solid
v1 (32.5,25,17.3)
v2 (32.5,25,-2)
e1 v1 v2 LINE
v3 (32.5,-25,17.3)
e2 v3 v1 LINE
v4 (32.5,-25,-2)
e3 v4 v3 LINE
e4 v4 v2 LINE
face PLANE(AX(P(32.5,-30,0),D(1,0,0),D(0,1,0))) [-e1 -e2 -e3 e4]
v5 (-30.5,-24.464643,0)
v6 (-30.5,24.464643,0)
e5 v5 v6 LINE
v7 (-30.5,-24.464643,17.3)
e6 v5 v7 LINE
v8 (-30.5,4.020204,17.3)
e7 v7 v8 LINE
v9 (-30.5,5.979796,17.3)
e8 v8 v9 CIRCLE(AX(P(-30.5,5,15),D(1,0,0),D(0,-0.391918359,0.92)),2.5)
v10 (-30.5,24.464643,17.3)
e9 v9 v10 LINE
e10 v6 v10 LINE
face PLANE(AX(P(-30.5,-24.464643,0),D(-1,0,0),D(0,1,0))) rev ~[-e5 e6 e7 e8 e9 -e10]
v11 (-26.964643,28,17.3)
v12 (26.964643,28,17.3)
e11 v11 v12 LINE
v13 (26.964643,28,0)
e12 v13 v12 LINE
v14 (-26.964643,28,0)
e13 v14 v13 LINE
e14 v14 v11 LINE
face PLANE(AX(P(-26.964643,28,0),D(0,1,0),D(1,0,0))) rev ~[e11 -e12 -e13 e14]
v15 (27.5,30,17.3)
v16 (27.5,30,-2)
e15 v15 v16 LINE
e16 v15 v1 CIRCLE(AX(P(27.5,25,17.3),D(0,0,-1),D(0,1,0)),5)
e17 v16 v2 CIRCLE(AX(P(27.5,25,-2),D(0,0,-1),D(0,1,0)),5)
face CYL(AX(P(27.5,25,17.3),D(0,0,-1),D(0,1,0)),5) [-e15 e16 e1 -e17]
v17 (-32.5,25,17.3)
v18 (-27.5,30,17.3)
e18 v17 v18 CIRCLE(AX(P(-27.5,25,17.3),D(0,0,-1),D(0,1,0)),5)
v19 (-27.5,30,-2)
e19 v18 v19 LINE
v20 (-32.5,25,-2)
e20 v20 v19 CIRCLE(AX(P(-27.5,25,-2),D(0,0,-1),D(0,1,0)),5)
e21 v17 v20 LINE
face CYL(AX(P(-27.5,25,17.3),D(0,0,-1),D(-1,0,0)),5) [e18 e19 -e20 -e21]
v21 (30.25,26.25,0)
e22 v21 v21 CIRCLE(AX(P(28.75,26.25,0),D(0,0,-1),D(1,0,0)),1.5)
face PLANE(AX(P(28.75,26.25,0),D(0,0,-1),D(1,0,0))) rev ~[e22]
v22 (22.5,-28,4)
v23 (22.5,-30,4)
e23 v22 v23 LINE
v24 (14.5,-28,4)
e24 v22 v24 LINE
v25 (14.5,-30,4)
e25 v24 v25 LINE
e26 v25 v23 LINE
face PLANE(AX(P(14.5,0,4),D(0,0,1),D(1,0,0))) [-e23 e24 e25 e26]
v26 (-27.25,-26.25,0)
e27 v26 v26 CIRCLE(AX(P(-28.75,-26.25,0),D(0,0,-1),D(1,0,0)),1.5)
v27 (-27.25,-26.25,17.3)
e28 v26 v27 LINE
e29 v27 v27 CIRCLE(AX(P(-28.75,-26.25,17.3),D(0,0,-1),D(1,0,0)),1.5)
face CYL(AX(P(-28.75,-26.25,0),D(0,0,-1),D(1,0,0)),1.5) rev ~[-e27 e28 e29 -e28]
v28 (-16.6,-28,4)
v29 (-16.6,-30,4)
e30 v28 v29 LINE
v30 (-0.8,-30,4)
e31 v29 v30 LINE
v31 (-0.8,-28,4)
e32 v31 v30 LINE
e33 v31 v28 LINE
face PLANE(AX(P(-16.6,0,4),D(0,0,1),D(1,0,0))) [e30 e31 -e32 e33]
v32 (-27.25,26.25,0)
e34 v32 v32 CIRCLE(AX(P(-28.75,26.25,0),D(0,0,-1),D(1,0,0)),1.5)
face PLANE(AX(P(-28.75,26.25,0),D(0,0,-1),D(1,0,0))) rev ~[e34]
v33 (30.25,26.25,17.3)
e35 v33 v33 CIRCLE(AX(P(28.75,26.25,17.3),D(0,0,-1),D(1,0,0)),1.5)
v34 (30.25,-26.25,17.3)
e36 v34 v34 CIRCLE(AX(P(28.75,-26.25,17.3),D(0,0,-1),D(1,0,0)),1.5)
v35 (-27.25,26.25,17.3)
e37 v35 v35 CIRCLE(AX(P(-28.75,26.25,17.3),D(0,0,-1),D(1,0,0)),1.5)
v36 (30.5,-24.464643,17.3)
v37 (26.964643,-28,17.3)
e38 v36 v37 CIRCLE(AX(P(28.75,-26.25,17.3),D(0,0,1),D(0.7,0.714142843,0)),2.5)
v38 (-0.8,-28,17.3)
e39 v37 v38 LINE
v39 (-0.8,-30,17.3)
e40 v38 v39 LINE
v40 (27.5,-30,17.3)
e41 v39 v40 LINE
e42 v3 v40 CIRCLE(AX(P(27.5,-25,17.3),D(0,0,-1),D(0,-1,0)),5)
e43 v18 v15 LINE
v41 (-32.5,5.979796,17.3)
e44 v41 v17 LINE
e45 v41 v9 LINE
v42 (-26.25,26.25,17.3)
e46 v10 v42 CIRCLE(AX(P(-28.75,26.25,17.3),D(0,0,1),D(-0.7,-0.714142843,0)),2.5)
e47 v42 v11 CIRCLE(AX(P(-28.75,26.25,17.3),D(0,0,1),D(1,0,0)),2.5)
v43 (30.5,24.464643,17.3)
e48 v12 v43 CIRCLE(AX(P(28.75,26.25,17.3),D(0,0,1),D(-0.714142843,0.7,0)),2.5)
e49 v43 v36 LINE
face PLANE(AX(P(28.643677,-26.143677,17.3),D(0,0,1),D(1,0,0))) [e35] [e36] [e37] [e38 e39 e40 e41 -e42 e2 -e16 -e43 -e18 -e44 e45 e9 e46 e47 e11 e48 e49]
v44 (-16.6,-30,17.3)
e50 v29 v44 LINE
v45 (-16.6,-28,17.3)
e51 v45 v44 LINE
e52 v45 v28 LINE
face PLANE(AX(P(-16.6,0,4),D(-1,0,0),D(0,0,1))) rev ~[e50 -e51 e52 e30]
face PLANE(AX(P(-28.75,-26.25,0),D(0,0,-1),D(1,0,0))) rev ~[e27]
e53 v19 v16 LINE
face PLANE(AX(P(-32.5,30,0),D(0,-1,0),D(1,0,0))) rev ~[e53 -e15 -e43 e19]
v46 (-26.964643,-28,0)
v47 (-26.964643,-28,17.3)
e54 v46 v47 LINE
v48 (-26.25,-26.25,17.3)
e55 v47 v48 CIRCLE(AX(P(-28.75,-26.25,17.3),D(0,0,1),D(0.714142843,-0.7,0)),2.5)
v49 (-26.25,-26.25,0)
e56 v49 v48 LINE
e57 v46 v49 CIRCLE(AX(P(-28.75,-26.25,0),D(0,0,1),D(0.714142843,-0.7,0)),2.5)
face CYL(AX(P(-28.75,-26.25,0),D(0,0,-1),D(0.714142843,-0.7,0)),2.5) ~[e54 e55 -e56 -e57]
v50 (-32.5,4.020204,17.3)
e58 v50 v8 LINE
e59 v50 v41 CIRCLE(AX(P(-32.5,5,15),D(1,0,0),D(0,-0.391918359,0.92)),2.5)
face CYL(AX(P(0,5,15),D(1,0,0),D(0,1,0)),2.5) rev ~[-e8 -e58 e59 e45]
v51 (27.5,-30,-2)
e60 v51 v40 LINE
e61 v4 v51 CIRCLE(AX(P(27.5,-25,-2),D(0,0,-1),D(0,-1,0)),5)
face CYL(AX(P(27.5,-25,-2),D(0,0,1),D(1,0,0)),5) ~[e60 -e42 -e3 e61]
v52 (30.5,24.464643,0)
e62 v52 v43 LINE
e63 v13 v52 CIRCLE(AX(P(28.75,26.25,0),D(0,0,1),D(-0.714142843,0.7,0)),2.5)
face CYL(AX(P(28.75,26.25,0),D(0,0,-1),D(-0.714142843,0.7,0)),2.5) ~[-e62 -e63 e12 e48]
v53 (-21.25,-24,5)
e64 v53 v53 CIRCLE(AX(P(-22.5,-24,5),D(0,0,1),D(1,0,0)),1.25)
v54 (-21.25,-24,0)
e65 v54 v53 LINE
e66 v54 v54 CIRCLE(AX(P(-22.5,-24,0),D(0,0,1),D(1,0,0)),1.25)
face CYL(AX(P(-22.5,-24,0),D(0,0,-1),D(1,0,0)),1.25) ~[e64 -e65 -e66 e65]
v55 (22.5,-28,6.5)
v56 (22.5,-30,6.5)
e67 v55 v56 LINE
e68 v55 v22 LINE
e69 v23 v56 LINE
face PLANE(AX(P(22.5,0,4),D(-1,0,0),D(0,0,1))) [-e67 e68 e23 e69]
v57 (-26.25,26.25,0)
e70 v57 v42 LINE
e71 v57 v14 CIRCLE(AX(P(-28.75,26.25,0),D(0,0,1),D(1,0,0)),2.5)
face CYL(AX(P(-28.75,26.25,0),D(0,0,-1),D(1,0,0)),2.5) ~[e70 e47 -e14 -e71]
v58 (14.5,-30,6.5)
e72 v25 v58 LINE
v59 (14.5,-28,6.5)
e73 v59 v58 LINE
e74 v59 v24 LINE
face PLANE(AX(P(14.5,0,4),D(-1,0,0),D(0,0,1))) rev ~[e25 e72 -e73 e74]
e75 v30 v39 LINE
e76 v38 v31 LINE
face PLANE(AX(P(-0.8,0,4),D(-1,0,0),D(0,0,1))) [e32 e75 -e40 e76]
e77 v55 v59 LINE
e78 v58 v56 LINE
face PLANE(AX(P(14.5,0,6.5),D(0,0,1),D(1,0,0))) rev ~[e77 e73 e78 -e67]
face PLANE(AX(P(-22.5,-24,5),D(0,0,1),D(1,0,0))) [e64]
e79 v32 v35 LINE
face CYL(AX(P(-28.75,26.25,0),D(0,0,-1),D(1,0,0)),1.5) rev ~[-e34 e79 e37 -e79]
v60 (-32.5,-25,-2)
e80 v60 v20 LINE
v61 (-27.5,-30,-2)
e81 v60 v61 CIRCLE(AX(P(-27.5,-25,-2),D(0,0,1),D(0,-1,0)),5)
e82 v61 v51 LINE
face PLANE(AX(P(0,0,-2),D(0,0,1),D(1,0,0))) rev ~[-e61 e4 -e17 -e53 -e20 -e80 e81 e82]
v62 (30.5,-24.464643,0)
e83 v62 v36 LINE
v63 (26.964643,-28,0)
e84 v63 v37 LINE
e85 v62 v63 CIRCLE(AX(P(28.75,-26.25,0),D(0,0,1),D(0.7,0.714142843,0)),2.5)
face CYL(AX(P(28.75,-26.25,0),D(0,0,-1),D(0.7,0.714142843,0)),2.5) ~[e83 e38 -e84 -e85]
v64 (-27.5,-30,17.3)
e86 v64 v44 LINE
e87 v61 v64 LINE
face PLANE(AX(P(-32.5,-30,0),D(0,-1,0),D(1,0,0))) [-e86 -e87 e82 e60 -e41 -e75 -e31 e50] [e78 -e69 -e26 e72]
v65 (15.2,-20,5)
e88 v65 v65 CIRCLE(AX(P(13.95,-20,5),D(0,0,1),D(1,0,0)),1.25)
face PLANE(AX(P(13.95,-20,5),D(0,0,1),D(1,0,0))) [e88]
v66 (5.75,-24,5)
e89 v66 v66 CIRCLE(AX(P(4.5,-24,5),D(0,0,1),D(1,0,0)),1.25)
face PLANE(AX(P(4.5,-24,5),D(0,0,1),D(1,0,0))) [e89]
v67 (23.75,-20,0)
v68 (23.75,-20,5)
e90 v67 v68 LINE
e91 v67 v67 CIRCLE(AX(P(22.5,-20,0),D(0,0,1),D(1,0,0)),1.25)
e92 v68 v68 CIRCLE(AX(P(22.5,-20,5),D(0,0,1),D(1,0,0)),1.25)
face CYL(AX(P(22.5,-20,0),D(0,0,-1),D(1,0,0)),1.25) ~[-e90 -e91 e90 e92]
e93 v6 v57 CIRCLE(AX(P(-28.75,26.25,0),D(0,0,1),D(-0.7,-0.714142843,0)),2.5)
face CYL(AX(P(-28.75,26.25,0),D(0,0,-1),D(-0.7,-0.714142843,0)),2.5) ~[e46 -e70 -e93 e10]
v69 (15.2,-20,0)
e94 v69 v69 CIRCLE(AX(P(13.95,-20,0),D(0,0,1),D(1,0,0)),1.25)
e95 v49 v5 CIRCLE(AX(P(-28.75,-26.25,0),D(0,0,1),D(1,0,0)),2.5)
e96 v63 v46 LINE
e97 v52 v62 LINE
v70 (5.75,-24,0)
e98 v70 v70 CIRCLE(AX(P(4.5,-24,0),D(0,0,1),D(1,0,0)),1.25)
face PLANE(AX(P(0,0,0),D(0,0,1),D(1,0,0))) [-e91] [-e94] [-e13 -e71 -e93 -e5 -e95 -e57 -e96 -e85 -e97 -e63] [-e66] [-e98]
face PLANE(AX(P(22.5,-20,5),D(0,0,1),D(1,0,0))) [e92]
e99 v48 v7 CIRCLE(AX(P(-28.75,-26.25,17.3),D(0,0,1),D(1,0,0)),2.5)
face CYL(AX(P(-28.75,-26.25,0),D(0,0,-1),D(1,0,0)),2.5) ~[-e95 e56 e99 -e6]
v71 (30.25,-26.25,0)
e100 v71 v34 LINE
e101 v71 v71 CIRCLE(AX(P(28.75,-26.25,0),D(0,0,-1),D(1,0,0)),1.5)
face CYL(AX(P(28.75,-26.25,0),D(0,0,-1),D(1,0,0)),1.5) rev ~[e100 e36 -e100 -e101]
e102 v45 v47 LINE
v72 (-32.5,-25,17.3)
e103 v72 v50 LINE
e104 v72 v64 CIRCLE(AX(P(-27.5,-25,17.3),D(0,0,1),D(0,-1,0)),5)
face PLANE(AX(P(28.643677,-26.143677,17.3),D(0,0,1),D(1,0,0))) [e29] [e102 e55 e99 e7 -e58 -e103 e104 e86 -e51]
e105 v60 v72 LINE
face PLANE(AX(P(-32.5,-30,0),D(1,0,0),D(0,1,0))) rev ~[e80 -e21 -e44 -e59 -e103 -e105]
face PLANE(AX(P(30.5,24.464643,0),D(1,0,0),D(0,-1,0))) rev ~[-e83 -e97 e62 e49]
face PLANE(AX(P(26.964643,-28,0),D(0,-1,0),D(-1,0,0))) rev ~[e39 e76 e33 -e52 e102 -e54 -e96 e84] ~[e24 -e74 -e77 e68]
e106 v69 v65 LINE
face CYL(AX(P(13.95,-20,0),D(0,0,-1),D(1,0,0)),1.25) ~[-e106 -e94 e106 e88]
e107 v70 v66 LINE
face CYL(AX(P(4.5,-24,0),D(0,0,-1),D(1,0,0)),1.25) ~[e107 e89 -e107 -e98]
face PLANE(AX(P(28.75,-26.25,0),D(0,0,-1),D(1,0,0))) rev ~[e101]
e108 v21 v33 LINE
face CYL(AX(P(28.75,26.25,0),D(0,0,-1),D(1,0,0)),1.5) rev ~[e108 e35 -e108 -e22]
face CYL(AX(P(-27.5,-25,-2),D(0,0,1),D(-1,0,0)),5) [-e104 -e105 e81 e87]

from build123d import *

# Parameters (mm, degrees)
F0_W      = 65
F0_H      = 60
F1_DEPTH  = 17.3
F3_START  = 25
F2_W      = 15.8
F2_H      = 13.3
F3_DEPTH  = 2.5
F5_D      = 5
F5_DEPTH  = 32.501
F2_W_2    = 8
F2_H_2    = 2.5
F6_DEPTH  = 30
F0_R      = 1.25
F7_DEPTH  = 2
F8_DEPTH  = 5
F9_DEPTH  = 17.3
F10_D     = 3
F10_DEPTH = 22
F10_TIP   = 0.9012909285
F11_DEPTH = 30
F12_R     = 5


# Not quite as in the source:
# - a feature names something its author has since deleted; it is built from what else it names


with BuildPart() as f1:
    # F0 (on Top) → F1 (new body)
    with BuildSketch(Plane.XY):
        Rectangle(F0_W, F0_H)
        with BuildLine():
            ThreePointArc((-30.5, 24.4646428929), (-30.517766953, 28.017766953), (-26.9646428929, 28))
            Line((-26.9646428929, 28), (26.9646428929, 28))
            ThreePointArc((26.9646428929, 28), (29.6951474044, 28.5644537982), (31.25, 26.25))
            ThreePointArc((31.25, 26.25), (31.0548861143, 25.2817541634), (30.5, 24.4646428929))
            Line((30.5, 24.4646428929), (30.5, -24.4646428929))
            ThreePointArc((30.5, -24.4646428929), (31.0548861143, -25.2817541634), (31.25, -26.25))
            ThreePointArc((31.25, -26.25), (29.6951474044, -28.5644537982), (26.9646428929, -28))
            Line((26.9646428929, -28), (-26.9646428929, -28))
            ThreePointArc((-26.9646428929, -28), (-30.517766953, -28.017766953), (-30.5, -24.4646428929))
            Line((-30.5, -24.4646428929), (-30.5, 24.4646428929))
        make_face(mode=Mode.SUBTRACT)
    extrude(amount=F1_DEPTH)

    # F2 (on Front) → F3 (cut)
    with BuildSketch(Plane.XZ.offset(F3_START)):
        with Locations((-8.7, 10.65)):
            Rectangle(F2_W, F2_H)
    extrude(amount=F3_DEPTH, mode=Mode.SUBTRACT)

    # F5 (through all, one way)
    with BuildSketch(Plane.YZ):
        with Locations((5, 15)):
            Circle(F5_D / 2)
    extrude(amount=-F5_DEPTH, mode=Mode.SUBTRACT)

    # F2 (on Front) → F6 (cut)
    with BuildSketch(Plane.XZ):
        with Locations((18.5, 5.25)):
            Rectangle(F2_W_2, F2_H_2)
    extrude(amount=F6_DEPTH, mode=Mode.SUBTRACT)

    # F0 (on Top) → F7 (join)
    with BuildSketch(Plane.XY):
        Rectangle(F0_W, F0_H)
        with BuildLine():
            ThreePointArc((-30.5, 24.4646428929), (-30.517766953, 28.017766953), (-26.9646428929, 28))
            Line((-26.9646428929, 28), (26.9646428929, 28))
            ThreePointArc((26.9646428929, 28), (29.6951474044, 28.5644537982), (31.25, 26.25))
            ThreePointArc((31.25, 26.25), (31.0548861143, 25.2817541634), (30.5, 24.4646428929))
            Line((30.5, 24.4646428929), (30.5, -24.4646428929))
            ThreePointArc((30.5, -24.4646428929), (31.0548861143, -25.2817541634), (31.25, -26.25))
            ThreePointArc((31.25, -26.25), (29.6951474044, -28.5644537982), (26.9646428929, -28))
            Line((26.9646428929, -28), (-26.9646428929, -28))
            ThreePointArc((-26.9646428929, -28), (-30.517766953, -28.017766953), (-30.5, -24.4646428929))
            Line((-30.5, -24.4646428929), (-30.5, 24.4646428929))
        make_face(mode=Mode.SUBTRACT)
        with BuildLine():
            Line((26.9646428929, 28), (-26.9646428929, 28))
            ThreePointArc((-26.9646428929, 28), (-26.4355462018, 27.1951474044), (-26.25, 26.25))
            ThreePointArc((-26.25, 26.25), (-27.7817541634, 23.9451138857), (-30.5, 24.4646428929))
            Line((-30.5, 24.4646428929), (-30.5, -24.4646428929))
            ThreePointArc((-30.5, -24.4646428929), (-27.7817541634, -23.9451138857), (-26.25, -26.25))
            ThreePointArc((-26.25, -26.25), (-26.4355462018, -27.1951474044), (-26.9646428929, -28))
            Line((-26.9646428929, -28), (26.9646428929, -28))
            ThreePointArc((26.9646428929, -28), (26.982233047, -24.482233047), (30.5, -24.4646428929))
            Line((30.5, -24.4646428929), (30.5, 24.4646428929))
            ThreePointArc((30.5, 24.4646428929), (26.982233047, 24.482233047), (26.9646428929, 28))
        make_face()
        with Locations((-22.5, -24)):
            Circle(F0_R, mode=Mode.SUBTRACT)
        with Locations((4.5, -24)):
            Circle(F0_R, mode=Mode.SUBTRACT)
        with Locations((13.95, -20)):
            Circle(F0_R, mode=Mode.SUBTRACT)
        with Locations((22.5, -20)):
            Circle(F0_R, mode=Mode.SUBTRACT)
        with BuildLine():
            Line((-26.9646428929, 28), (-30.5, 28))
            Line((-30.5, 28), (-30.5, 24.4646428929))
            ThreePointArc((-30.5, 24.4646428929), (-27.7817541634, 23.9451138857), (-26.25, 26.25))
            ThreePointArc((-26.25, 26.25), (-26.4355462018, 27.1951474044), (-26.9646428929, 28))
        make_face()
        with BuildLine():
            Line((30.5, 28), (26.9646428929, 28))
            ThreePointArc((26.9646428929, 28), (26.982233047, 24.482233047), (30.5, 24.4646428929))
            Line((30.5, 24.4646428929), (30.5, 28))
        make_face()
        with BuildLine():
            ThreePointArc((-26.25, -26.25), (-27.7817541634, -23.9451138857), (-30.5, -24.4646428929))
            Line((-30.5, -24.4646428929), (-30.5, -28))
            Line((-30.5, -28), (-26.9646428929, -28))
            ThreePointArc((-26.9646428929, -28), (-26.4355462018, -27.1951474044), (-26.25, -26.25))
        make_face()
        with BuildLine():
            Line((30.5, -28), (30.5, -24.4646428929))
            ThreePointArc((30.5, -24.4646428929), (26.982233047, -24.482233047), (26.9646428929, -28))
            Line((26.9646428929, -28), (30.5, -28))
        make_face()
        with Locations((22.5, -20)):
            Circle(F0_R)
        with Locations((13.95, -20)):
            Circle(F0_R)
        with Locations((-22.5, -24)):
            Circle(F0_R)
        with Locations((4.5, -24)):
            Circle(F0_R)
        with BuildLine():
            Line((-30.5, 24.4646428929), (-30.5, 28))
            Line((-30.5, 28), (-26.9646428929, 28))
            ThreePointArc((-26.9646428929, 28), (-30.517766953, 28.017766953), (-30.5, 24.4646428929))
        make_face()
        with BuildLine():
            ThreePointArc((31.25, 26.25), (29.6951474044, 28.5644537982), (26.9646428929, 28))
            Line((26.9646428929, 28), (30.5, 28))
            Line((30.5, 28), (30.5, 24.4646428929))
            ThreePointArc((30.5, 24.4646428929), (31.0548861143, 25.2817541634), (31.25, 26.25))
        make_face()
        with BuildLine():
            Line((-30.5, -28), (-30.5, -24.4646428929))
            ThreePointArc((-30.5, -24.4646428929), (-30.517766953, -28.017766953), (-26.9646428929, -28))
            Line((-26.9646428929, -28), (-30.5, -28))
        make_face()
        with BuildLine():
            ThreePointArc((31.25, -26.25), (31.0548861143, -25.2817541634), (30.5, -24.4646428929))
            Line((30.5, -24.4646428929), (30.5, -28))
            Line((30.5, -28), (26.9646428929, -28))
            ThreePointArc((26.9646428929, -28), (29.6951474044, -28.5644537982), (31.25, -26.25))
        make_face()
    extrude(amount=-F7_DEPTH)

    # F0 (on Top) → F8 (join)
    with BuildSketch(Plane.XY):
        with Locations((22.5, -20)):
            Circle(F0_R)
        with Locations((13.95, -20)):
            Circle(F0_R)
        with Locations((-22.5, -24)):
            Circle(F0_R)
        with Locations((4.5, -24)):
            Circle(F0_R)
    extrude(amount=F8_DEPTH)

    # F0 (on Top) → F9 (join)
    with BuildSketch(Plane.XY):
        with BuildLine():
            Line((30.5, -28), (30.5, -24.4646428929))
            ThreePointArc((30.5, -24.4646428929), (26.982233047, -24.482233047), (26.9646428929, -28))
            Line((26.9646428929, -28), (30.5, -28))
        make_face()
        with BuildLine():
            ThreePointArc((31.25, -26.25), (31.0548861143, -25.2817541634), (30.5, -24.4646428929))
            Line((30.5, -24.4646428929), (30.5, -28))
            Line((30.5, -28), (26.9646428929, -28))
            ThreePointArc((26.9646428929, -28), (29.6951474044, -28.5644537982), (31.25, -26.25))
        make_face()
        with BuildLine():
            ThreePointArc((31.25, 26.25), (29.6951474044, 28.5644537982), (26.9646428929, 28))
            Line((26.9646428929, 28), (30.5, 28))
            Line((30.5, 28), (30.5, 24.4646428929))
            ThreePointArc((30.5, 24.4646428929), (31.0548861143, 25.2817541634), (31.25, 26.25))
        make_face()
        with BuildLine():
            Line((30.5, 28), (26.9646428929, 28))
            ThreePointArc((26.9646428929, 28), (26.982233047, 24.482233047), (30.5, 24.4646428929))
            Line((30.5, 24.4646428929), (30.5, 28))
        make_face()
        with BuildLine():
            Line((-26.9646428929, 28), (-30.5, 28))
            Line((-30.5, 28), (-30.5, 24.4646428929))
            ThreePointArc((-30.5, 24.4646428929), (-27.7817541634, 23.9451138857), (-26.25, 26.25))
            ThreePointArc((-26.25, 26.25), (-26.4355462018, 27.1951474044), (-26.9646428929, 28))
        make_face()
        with BuildLine():
            Line((-30.5, 24.4646428929), (-30.5, 28))
            Line((-30.5, 28), (-26.9646428929, 28))
            ThreePointArc((-26.9646428929, 28), (-30.517766953, 28.017766953), (-30.5, 24.4646428929))
        make_face()
        with BuildLine():
            Line((-30.5, -28), (-30.5, -24.4646428929))
            ThreePointArc((-30.5, -24.4646428929), (-30.517766953, -28.017766953), (-26.9646428929, -28))
            Line((-26.9646428929, -28), (-30.5, -28))
        make_face()
        with BuildLine():
            ThreePointArc((-26.25, -26.25), (-27.7817541634, -23.9451138857), (-30.5, -24.4646428929))
            Line((-30.5, -24.4646428929), (-30.5, -28))
            Line((-30.5, -28), (-26.9646428929, -28))
            ThreePointArc((-26.9646428929, -28), (-26.4355462018, -27.1951474044), (-26.25, -26.25))
        make_face()
    extrude(amount=F9_DEPTH)

    # F10 (one way)
    with BuildSketch(Plane(origin=(0, 0, 0), x_dir=(1, 0, 0), z_dir=(0, 0, -1))):
        with Locations((-28.75, -26.25), (28.75, -26.25), (28.75, 26.25), (-28.75, 26.25)):
            Circle(F10_D / 2)
    extrude(amount=-F10_DEPTH, mode=Mode.SUBTRACT)
    with Locations(Plane(origin=(0, 0, 0), x_dir=(1, 0, 0), z_dir=(0, 0, -1))):
        with Locations((-28.75, -26.25), (28.75, -26.25), (28.75, 26.25), (-28.75, 26.25)):
            with Locations((0, 0, -(F10_DEPTH + F10_TIP / 2))):  # 118° drill point
                Cone(0, F10_D / 2, F10_TIP, mode=Mode.SUBTRACT)

    # F2 (on Front) → F11 (cut)
    with BuildSketch(Plane.XZ):
        with Locations((-8.7, 10.65)):
            Rectangle(F2_W, F2_H)
    extrude(amount=F11_DEPTH, mode=Mode.SUBTRACT)

    # F12
    f12_edges = [f1.edges().sort_by_distance(p)[0] for p in [
        (32.5, -30, 7.65),
        (32.5, 30, 7.65),
        (-32.5, 30, 7.65),
        (-32.5, -30, 7.65),
    ]]
    fillet(f12_edges, radius=F12_R)


solid = f1.part
